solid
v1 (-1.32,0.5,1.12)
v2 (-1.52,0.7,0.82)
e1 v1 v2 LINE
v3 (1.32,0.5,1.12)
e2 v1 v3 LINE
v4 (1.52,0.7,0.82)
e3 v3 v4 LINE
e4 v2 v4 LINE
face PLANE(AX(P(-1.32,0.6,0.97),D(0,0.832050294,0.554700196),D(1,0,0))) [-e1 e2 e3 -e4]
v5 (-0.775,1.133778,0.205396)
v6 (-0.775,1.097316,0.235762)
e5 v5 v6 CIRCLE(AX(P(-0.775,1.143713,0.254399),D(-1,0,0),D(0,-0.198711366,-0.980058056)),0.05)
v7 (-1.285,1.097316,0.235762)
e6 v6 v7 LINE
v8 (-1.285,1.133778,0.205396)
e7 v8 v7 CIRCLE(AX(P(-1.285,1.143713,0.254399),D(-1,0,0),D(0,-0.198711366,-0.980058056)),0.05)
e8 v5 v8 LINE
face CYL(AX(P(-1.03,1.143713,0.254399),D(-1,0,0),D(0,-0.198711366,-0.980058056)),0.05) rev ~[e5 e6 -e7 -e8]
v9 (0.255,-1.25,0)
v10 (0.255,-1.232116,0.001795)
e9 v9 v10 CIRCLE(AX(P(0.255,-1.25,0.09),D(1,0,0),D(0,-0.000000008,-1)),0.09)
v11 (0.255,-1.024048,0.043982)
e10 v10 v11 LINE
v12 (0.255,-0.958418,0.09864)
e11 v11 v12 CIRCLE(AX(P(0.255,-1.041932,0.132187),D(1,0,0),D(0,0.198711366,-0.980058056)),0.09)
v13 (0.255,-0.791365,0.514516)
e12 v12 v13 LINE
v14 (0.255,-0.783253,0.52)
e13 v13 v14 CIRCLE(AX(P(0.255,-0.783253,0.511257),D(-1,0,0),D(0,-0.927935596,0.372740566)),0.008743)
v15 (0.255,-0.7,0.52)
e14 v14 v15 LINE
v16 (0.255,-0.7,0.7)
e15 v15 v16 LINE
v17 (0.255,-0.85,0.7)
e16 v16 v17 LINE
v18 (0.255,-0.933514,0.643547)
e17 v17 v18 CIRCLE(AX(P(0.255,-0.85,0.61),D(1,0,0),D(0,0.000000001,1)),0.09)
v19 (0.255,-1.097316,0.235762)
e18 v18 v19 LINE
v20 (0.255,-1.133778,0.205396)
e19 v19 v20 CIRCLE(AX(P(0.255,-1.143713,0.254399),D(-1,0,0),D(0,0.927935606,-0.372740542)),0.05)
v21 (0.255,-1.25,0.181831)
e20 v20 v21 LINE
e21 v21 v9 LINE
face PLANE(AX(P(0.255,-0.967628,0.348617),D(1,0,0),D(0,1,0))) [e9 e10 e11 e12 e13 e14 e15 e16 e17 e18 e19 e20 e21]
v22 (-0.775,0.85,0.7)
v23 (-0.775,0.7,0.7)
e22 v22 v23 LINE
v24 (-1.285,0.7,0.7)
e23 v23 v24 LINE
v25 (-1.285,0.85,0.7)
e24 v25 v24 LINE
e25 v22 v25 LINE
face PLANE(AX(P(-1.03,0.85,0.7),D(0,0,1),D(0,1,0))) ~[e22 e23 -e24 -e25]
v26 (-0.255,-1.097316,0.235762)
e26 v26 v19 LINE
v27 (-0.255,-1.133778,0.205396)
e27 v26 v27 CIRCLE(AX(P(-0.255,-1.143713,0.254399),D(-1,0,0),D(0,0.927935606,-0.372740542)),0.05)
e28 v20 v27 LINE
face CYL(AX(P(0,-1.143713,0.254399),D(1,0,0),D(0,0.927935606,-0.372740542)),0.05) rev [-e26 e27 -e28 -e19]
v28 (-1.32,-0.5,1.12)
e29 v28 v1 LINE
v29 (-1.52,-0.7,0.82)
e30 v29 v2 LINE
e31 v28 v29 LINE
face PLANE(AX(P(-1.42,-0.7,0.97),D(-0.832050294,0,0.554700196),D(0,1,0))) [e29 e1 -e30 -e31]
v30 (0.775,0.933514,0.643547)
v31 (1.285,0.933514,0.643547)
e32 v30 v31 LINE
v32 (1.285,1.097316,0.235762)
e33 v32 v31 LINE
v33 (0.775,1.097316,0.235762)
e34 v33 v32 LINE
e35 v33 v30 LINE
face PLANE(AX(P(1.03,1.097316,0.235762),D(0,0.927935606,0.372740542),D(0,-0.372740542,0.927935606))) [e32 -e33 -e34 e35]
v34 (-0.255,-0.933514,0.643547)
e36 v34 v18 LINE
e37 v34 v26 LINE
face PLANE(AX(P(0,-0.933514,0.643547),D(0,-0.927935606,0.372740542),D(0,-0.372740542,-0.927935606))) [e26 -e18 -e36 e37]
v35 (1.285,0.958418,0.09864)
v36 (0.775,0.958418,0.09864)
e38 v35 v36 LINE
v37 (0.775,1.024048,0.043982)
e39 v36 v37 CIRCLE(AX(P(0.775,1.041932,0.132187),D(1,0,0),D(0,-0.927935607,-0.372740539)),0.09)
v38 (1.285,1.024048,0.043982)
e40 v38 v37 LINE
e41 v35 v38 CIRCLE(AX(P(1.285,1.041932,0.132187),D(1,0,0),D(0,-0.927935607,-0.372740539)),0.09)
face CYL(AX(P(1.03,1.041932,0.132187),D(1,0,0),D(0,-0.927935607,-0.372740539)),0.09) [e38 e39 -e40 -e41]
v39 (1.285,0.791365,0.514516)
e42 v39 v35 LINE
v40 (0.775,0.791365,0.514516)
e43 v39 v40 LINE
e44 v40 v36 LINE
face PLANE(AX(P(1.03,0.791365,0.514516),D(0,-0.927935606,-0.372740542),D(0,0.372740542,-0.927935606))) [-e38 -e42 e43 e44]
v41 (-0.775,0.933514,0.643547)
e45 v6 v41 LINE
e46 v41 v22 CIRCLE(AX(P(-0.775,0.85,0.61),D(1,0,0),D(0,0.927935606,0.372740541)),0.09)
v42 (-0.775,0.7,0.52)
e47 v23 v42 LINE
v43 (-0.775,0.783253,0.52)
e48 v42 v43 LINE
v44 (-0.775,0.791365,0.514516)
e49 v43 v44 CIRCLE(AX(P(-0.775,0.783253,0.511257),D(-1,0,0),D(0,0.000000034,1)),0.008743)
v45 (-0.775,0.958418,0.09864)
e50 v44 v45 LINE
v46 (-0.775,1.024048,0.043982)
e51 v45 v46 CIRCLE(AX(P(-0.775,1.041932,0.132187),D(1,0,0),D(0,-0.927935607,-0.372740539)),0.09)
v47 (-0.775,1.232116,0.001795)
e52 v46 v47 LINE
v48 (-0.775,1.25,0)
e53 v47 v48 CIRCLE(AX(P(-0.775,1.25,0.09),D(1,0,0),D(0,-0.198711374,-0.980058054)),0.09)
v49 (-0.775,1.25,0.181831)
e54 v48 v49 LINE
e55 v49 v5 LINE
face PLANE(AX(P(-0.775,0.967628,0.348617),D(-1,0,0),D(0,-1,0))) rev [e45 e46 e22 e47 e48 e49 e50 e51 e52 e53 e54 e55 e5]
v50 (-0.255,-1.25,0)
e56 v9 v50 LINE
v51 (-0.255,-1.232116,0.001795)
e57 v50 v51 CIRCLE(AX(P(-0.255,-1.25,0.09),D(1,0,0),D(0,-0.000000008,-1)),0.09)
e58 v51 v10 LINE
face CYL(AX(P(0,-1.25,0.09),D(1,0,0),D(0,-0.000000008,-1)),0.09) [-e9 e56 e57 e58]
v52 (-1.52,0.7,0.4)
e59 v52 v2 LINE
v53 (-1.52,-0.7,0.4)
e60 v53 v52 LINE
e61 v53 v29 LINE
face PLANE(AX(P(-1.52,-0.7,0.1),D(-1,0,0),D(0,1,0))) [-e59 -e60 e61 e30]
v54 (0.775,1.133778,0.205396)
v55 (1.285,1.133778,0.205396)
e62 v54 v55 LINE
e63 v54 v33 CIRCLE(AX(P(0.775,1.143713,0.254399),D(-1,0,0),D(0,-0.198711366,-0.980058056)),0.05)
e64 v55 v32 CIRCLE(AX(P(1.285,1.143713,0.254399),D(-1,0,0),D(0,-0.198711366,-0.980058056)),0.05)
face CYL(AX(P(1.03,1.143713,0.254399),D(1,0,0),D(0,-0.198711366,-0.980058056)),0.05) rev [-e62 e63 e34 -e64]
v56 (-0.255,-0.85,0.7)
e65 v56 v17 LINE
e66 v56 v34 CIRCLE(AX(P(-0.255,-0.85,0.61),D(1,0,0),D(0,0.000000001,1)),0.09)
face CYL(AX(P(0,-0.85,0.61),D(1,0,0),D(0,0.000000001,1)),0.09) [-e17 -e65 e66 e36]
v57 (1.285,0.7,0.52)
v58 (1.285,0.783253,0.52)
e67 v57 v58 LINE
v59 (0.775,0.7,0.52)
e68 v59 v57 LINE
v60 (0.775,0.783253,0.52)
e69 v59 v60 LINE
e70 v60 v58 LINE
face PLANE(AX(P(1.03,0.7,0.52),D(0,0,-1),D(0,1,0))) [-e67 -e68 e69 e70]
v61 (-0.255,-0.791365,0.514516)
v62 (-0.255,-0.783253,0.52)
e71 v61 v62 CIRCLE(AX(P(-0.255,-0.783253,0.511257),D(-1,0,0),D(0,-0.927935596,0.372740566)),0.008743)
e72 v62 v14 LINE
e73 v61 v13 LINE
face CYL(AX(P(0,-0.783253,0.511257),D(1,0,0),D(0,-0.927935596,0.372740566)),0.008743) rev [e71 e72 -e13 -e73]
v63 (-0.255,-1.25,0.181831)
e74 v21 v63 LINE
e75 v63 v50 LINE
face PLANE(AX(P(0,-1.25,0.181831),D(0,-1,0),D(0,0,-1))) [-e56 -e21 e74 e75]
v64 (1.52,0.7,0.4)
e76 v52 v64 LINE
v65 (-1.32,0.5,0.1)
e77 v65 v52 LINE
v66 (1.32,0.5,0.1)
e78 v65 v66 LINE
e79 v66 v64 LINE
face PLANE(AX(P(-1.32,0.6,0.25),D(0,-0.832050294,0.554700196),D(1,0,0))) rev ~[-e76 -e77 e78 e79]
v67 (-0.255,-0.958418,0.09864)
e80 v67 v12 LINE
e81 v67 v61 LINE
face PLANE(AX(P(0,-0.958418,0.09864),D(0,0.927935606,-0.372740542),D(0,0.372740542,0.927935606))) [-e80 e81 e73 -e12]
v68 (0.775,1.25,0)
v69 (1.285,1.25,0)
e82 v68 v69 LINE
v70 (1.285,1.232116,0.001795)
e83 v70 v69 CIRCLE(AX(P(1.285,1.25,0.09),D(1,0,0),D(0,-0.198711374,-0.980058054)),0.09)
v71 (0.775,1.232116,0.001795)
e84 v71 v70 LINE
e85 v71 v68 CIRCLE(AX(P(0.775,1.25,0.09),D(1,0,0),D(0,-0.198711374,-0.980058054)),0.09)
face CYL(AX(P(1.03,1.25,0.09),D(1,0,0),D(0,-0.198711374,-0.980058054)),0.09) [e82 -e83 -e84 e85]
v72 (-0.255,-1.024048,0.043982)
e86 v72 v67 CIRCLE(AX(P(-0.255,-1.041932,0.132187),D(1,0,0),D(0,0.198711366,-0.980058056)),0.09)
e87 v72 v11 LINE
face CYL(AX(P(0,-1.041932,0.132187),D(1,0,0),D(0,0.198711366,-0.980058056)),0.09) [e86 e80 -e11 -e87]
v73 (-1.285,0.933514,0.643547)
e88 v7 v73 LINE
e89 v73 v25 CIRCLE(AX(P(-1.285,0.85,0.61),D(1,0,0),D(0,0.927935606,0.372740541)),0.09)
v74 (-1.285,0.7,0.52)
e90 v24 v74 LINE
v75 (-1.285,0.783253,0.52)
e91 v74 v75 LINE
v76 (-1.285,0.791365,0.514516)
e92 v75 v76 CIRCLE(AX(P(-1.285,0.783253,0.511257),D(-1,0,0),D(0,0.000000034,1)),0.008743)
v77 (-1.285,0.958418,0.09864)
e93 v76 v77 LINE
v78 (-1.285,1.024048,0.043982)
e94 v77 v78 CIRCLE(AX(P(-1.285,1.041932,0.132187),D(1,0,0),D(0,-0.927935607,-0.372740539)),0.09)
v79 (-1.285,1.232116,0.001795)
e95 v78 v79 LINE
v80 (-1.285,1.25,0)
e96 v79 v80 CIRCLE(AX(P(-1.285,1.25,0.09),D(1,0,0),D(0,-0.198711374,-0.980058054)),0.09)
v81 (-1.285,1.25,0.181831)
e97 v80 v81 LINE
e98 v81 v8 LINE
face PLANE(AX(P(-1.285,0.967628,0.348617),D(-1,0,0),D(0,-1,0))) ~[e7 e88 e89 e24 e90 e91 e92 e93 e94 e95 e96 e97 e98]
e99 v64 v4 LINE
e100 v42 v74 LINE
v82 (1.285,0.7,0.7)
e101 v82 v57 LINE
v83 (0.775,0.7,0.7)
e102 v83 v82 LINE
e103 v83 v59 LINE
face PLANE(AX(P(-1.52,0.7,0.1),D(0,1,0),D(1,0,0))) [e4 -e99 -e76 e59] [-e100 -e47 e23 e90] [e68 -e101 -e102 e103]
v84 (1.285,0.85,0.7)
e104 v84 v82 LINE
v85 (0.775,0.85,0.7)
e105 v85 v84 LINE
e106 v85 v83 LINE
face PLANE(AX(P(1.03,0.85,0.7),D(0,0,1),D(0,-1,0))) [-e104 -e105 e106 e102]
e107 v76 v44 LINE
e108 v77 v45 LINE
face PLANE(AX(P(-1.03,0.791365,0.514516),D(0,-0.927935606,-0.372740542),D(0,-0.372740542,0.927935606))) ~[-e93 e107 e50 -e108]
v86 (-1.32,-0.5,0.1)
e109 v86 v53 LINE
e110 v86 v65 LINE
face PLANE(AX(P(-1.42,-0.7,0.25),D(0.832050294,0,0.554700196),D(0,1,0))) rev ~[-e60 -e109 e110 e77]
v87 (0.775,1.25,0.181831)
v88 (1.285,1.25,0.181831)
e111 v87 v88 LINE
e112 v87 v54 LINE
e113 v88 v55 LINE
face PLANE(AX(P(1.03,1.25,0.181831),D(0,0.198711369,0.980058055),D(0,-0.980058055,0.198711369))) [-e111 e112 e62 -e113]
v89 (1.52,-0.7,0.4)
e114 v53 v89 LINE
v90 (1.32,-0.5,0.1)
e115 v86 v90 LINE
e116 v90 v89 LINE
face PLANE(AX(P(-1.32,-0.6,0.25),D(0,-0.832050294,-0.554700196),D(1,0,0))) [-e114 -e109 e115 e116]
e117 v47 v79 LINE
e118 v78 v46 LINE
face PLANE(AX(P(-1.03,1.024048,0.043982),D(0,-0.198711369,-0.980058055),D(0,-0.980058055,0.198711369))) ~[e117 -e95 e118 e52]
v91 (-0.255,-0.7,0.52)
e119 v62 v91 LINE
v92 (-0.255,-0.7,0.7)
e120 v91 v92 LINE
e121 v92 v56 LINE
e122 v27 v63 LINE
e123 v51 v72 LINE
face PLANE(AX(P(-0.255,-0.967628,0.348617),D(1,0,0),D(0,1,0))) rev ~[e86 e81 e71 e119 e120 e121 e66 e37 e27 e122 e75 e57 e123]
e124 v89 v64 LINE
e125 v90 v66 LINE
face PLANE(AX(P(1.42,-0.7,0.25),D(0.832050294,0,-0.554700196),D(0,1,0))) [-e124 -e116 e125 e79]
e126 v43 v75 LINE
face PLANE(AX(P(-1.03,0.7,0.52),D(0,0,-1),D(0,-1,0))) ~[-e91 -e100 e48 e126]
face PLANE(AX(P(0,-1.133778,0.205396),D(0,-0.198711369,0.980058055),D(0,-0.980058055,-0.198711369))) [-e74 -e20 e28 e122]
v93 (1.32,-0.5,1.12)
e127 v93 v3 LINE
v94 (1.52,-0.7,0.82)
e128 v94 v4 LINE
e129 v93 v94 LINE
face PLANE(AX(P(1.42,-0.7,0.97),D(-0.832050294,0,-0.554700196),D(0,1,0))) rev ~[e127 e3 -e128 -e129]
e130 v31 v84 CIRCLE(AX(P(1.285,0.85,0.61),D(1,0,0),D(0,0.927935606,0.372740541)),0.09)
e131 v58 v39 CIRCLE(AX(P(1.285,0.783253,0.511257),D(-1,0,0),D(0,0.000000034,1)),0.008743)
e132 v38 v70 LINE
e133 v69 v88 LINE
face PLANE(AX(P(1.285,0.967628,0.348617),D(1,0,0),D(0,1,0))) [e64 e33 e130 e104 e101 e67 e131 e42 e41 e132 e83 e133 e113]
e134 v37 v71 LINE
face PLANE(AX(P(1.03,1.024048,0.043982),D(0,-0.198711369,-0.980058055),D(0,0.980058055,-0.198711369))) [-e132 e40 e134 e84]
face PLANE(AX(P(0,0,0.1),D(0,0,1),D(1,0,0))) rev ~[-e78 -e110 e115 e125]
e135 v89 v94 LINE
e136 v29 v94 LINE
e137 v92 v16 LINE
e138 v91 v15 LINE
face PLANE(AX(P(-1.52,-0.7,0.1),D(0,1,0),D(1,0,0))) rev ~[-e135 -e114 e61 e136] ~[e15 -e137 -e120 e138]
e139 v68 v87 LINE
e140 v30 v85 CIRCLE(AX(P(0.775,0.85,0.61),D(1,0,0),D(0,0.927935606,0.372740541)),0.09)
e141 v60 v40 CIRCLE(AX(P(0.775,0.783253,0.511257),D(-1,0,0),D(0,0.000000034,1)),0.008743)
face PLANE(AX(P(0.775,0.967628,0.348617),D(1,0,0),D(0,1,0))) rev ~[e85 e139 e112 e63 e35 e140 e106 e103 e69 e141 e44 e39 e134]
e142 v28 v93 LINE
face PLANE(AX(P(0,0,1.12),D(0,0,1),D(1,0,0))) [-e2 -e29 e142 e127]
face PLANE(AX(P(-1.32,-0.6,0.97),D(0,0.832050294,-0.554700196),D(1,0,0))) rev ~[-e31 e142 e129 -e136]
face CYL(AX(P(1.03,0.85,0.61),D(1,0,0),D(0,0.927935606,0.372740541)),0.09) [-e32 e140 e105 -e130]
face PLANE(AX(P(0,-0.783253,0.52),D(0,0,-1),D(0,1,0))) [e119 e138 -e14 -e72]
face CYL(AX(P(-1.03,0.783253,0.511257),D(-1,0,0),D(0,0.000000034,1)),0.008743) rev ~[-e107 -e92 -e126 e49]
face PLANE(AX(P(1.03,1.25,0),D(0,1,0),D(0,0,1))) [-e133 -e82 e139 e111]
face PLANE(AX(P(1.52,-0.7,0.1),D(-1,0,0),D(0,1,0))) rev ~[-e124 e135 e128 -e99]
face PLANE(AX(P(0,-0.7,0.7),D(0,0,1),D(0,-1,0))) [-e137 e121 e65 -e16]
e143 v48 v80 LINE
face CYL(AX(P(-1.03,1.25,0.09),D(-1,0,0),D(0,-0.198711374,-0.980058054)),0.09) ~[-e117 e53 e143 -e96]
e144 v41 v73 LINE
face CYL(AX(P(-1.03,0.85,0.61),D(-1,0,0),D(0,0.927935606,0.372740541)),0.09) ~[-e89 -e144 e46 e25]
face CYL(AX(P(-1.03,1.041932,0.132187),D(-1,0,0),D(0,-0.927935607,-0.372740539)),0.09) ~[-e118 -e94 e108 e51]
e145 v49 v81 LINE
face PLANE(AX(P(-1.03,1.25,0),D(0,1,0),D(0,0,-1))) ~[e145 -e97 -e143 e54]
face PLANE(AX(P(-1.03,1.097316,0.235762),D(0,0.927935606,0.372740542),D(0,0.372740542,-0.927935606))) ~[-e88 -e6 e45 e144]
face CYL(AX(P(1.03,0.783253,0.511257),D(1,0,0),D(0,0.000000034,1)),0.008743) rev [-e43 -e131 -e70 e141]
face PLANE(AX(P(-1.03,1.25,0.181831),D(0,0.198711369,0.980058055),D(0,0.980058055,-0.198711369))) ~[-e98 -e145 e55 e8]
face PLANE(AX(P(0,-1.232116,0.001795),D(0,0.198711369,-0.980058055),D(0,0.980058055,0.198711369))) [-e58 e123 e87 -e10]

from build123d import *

# Parameters (mm, degrees)
F1_W       = 3.04
F1_H       = 1.4
F2_DEPTH   = 1.02
F3_SIZE2   = 0.3
F3_SIZE    = 0.2
F3_2_SIZE2 = 0.3
F3_2_SIZE  = 0.2
F4_SIZE2   = 0.3
F4_SIZE    = 0.2
F4_2_SIZE2 = 0.3
F4_2_SIZE  = 0.2
F10_DEPTH  = 0.255
F13_DEPTH  = 0.255


# Not quite as in the source:
# - a pattern or mirror of a feature is missing from the dataset's text; its kind, count and spacing are read off the source's solid


with BuildPart() as f2:
    # F1 (on offset) → F2 (new body)
    with BuildSketch(Plane.XY.offset(0.1)):
        Rectangle(F1_W, F1_H)
    extrude(amount=F2_DEPTH)

    # F3
    f3_edges = [f2.edges().sort_by_distance(p)[0] for p in [
        (-1.52, 0, 1.12),
        (1.52, 0, 1.12),
    ]]
    f3_side = f2.faces().sort_by_distance((0, 0, 1.12))[0]
    chamfer(f3_edges, length=F3_SIZE, length2=F3_SIZE2, reference=f3_side)

    # F3#2
    f3_2_edges = [f2.edges().sort_by_distance(p)[0] for p in [
        (-1.52, 0, 0.1),
        (1.52, 0, 0.1),
    ]]
    f3_2_side = f2.faces().sort_by_distance((0, 0, 0.1))[0]
    chamfer(f3_2_edges, length=F3_2_SIZE, length2=F3_2_SIZE2, reference=f3_2_side)

    # F4
    f4_edges = [f2.edges().sort_by_distance(p)[0] for p in [
        (0, -0.7, 1.12),
        (0, 0.7, 1.12),
    ]]
    f4_side = f2.faces().sort_by_distance((0, 0, 1.12))[0]
    chamfer(f4_edges, length=F4_SIZE, length2=F4_SIZE2, reference=f4_side)

    # F4#2
    f4_2_edges = [f2.edges().sort_by_distance(p)[0] for p in [
        (0, -0.7, 0.1),
        (0, 0.7, 0.1),
    ]]
    f4_2_side = f2.faces().sort_by_distance((0, 0, 0.1))[0]
    chamfer(f4_2_edges, length=F4_2_SIZE, length2=F4_2_SIZE2, reference=f4_2_side)

    # F9 (on 3pt) → F10 (join, symmetric)
    with BuildSketch(Plane.YZ):
        with BuildLine():
            Line((-1.25, 0.09), (-1.25, 0))
            ThreePointArc((-1.25, 0), (-1.241013072, 0.0004498178), (-1.2321159768, 0.001794775))
            Line((-1.2321159768, 0.001794775), (-1.0240477755, 0.043981579))
            ThreePointArc((-1.0240477755, 0.043981579), (-0.9843358775, 0.063029665), (-0.9584175942, 0.0986401552))
            Line((-0.9584175942, 0.0986401552), (-0.7913652221, 0.5145161505))
            ThreePointArc((-0.7913652221, 0.5145161505), (-0.7881487587, 0.5185004288), (-0.7832526987, 0.5199999977))
            Line((-0.7832526987, 0.5199999977), (-0.7000000035, 0.5199999977))
            Line((-0.7000000035, 0.5199999977), (-0.7000000035, 0.7))
            Line((-0.7000000035, 0.7), (-0.85, 0.7))
            ThreePointArc((-0.85, 0.7), (-0.9004023889, 0.6845627199), (-0.9335142045, 0.6435466488))
            Line((-0.9335142045, 0.6435466488), (-1.0973164639, 0.2357617917))
            ThreePointArc((-1.0973164639, 0.2357617917), (-1.1117155102, 0.2159781861), (-1.1337776758, 0.2053959161))
            Line((-1.1337776758, 0.2053959161), (-1.25, 0.1818312946))
            Line((-1.25, 0.1818312946), (-1.25, 0.18))
            Line((-1.25, 0.18), (-1.25, 0.09))
        make_face()
    extrude(amount=F10_DEPTH, both=True)

    # F12 (on offset) → F13 (join, symmetric)
    with BuildSketch(Plane.YZ.offset(1.03)):
        with BuildLine():
            Line((1.0240477755, 0.043981579), (1.2321159768, 0.001794775))
            ThreePointArc((1.2321159768, 0.001794775), (1.241013072, 0.0004498178), (1.25, 0))
            Line((1.25, 0), (1.25, 0.1818312946))
            Line((1.25, 0.1818312946), (1.1337776758, 0.2053959161))
            ThreePointArc((1.1337776758, 0.2053959161), (1.1117155102, 0.2159781861), (1.0973164639, 0.2357617917))
            Line((1.0973164639, 0.2357617917), (0.9335142045, 0.6435466488))
            ThreePointArc((0.9335142045, 0.6435466488), (0.9004023889, 0.6845627199), (0.85, 0.7))
            Line((0.85, 0.7), (0.7000000035, 0.7))
            Line((0.7000000035, 0.7), (0.7000000035, 0.5199999977))
            Line((0.7000000035, 0.5199999977), (0.7832526987, 0.5199999977))
            ThreePointArc((0.7832526987, 0.5199999977), (0.7881487587, 0.5185004288), (0.7913652221, 0.5145161505))
            Line((0.7913652221, 0.5145161505), (0.9584175942, 0.0986401552))
            ThreePointArc((0.9584175942, 0.0986401552), (0.9843358775, 0.063029665), (1.0240477755, 0.043981579))
        make_face()
    f13 = extrude(amount=F13_DEPTH, both=True)

    # F13_copies: F13 across plane
    add(f13.mirror(Plane(origin=(0, 0, 0), x_dir=(0, 0, -1), z_dir=(-1, 0, 0))))


solid = f2.part
